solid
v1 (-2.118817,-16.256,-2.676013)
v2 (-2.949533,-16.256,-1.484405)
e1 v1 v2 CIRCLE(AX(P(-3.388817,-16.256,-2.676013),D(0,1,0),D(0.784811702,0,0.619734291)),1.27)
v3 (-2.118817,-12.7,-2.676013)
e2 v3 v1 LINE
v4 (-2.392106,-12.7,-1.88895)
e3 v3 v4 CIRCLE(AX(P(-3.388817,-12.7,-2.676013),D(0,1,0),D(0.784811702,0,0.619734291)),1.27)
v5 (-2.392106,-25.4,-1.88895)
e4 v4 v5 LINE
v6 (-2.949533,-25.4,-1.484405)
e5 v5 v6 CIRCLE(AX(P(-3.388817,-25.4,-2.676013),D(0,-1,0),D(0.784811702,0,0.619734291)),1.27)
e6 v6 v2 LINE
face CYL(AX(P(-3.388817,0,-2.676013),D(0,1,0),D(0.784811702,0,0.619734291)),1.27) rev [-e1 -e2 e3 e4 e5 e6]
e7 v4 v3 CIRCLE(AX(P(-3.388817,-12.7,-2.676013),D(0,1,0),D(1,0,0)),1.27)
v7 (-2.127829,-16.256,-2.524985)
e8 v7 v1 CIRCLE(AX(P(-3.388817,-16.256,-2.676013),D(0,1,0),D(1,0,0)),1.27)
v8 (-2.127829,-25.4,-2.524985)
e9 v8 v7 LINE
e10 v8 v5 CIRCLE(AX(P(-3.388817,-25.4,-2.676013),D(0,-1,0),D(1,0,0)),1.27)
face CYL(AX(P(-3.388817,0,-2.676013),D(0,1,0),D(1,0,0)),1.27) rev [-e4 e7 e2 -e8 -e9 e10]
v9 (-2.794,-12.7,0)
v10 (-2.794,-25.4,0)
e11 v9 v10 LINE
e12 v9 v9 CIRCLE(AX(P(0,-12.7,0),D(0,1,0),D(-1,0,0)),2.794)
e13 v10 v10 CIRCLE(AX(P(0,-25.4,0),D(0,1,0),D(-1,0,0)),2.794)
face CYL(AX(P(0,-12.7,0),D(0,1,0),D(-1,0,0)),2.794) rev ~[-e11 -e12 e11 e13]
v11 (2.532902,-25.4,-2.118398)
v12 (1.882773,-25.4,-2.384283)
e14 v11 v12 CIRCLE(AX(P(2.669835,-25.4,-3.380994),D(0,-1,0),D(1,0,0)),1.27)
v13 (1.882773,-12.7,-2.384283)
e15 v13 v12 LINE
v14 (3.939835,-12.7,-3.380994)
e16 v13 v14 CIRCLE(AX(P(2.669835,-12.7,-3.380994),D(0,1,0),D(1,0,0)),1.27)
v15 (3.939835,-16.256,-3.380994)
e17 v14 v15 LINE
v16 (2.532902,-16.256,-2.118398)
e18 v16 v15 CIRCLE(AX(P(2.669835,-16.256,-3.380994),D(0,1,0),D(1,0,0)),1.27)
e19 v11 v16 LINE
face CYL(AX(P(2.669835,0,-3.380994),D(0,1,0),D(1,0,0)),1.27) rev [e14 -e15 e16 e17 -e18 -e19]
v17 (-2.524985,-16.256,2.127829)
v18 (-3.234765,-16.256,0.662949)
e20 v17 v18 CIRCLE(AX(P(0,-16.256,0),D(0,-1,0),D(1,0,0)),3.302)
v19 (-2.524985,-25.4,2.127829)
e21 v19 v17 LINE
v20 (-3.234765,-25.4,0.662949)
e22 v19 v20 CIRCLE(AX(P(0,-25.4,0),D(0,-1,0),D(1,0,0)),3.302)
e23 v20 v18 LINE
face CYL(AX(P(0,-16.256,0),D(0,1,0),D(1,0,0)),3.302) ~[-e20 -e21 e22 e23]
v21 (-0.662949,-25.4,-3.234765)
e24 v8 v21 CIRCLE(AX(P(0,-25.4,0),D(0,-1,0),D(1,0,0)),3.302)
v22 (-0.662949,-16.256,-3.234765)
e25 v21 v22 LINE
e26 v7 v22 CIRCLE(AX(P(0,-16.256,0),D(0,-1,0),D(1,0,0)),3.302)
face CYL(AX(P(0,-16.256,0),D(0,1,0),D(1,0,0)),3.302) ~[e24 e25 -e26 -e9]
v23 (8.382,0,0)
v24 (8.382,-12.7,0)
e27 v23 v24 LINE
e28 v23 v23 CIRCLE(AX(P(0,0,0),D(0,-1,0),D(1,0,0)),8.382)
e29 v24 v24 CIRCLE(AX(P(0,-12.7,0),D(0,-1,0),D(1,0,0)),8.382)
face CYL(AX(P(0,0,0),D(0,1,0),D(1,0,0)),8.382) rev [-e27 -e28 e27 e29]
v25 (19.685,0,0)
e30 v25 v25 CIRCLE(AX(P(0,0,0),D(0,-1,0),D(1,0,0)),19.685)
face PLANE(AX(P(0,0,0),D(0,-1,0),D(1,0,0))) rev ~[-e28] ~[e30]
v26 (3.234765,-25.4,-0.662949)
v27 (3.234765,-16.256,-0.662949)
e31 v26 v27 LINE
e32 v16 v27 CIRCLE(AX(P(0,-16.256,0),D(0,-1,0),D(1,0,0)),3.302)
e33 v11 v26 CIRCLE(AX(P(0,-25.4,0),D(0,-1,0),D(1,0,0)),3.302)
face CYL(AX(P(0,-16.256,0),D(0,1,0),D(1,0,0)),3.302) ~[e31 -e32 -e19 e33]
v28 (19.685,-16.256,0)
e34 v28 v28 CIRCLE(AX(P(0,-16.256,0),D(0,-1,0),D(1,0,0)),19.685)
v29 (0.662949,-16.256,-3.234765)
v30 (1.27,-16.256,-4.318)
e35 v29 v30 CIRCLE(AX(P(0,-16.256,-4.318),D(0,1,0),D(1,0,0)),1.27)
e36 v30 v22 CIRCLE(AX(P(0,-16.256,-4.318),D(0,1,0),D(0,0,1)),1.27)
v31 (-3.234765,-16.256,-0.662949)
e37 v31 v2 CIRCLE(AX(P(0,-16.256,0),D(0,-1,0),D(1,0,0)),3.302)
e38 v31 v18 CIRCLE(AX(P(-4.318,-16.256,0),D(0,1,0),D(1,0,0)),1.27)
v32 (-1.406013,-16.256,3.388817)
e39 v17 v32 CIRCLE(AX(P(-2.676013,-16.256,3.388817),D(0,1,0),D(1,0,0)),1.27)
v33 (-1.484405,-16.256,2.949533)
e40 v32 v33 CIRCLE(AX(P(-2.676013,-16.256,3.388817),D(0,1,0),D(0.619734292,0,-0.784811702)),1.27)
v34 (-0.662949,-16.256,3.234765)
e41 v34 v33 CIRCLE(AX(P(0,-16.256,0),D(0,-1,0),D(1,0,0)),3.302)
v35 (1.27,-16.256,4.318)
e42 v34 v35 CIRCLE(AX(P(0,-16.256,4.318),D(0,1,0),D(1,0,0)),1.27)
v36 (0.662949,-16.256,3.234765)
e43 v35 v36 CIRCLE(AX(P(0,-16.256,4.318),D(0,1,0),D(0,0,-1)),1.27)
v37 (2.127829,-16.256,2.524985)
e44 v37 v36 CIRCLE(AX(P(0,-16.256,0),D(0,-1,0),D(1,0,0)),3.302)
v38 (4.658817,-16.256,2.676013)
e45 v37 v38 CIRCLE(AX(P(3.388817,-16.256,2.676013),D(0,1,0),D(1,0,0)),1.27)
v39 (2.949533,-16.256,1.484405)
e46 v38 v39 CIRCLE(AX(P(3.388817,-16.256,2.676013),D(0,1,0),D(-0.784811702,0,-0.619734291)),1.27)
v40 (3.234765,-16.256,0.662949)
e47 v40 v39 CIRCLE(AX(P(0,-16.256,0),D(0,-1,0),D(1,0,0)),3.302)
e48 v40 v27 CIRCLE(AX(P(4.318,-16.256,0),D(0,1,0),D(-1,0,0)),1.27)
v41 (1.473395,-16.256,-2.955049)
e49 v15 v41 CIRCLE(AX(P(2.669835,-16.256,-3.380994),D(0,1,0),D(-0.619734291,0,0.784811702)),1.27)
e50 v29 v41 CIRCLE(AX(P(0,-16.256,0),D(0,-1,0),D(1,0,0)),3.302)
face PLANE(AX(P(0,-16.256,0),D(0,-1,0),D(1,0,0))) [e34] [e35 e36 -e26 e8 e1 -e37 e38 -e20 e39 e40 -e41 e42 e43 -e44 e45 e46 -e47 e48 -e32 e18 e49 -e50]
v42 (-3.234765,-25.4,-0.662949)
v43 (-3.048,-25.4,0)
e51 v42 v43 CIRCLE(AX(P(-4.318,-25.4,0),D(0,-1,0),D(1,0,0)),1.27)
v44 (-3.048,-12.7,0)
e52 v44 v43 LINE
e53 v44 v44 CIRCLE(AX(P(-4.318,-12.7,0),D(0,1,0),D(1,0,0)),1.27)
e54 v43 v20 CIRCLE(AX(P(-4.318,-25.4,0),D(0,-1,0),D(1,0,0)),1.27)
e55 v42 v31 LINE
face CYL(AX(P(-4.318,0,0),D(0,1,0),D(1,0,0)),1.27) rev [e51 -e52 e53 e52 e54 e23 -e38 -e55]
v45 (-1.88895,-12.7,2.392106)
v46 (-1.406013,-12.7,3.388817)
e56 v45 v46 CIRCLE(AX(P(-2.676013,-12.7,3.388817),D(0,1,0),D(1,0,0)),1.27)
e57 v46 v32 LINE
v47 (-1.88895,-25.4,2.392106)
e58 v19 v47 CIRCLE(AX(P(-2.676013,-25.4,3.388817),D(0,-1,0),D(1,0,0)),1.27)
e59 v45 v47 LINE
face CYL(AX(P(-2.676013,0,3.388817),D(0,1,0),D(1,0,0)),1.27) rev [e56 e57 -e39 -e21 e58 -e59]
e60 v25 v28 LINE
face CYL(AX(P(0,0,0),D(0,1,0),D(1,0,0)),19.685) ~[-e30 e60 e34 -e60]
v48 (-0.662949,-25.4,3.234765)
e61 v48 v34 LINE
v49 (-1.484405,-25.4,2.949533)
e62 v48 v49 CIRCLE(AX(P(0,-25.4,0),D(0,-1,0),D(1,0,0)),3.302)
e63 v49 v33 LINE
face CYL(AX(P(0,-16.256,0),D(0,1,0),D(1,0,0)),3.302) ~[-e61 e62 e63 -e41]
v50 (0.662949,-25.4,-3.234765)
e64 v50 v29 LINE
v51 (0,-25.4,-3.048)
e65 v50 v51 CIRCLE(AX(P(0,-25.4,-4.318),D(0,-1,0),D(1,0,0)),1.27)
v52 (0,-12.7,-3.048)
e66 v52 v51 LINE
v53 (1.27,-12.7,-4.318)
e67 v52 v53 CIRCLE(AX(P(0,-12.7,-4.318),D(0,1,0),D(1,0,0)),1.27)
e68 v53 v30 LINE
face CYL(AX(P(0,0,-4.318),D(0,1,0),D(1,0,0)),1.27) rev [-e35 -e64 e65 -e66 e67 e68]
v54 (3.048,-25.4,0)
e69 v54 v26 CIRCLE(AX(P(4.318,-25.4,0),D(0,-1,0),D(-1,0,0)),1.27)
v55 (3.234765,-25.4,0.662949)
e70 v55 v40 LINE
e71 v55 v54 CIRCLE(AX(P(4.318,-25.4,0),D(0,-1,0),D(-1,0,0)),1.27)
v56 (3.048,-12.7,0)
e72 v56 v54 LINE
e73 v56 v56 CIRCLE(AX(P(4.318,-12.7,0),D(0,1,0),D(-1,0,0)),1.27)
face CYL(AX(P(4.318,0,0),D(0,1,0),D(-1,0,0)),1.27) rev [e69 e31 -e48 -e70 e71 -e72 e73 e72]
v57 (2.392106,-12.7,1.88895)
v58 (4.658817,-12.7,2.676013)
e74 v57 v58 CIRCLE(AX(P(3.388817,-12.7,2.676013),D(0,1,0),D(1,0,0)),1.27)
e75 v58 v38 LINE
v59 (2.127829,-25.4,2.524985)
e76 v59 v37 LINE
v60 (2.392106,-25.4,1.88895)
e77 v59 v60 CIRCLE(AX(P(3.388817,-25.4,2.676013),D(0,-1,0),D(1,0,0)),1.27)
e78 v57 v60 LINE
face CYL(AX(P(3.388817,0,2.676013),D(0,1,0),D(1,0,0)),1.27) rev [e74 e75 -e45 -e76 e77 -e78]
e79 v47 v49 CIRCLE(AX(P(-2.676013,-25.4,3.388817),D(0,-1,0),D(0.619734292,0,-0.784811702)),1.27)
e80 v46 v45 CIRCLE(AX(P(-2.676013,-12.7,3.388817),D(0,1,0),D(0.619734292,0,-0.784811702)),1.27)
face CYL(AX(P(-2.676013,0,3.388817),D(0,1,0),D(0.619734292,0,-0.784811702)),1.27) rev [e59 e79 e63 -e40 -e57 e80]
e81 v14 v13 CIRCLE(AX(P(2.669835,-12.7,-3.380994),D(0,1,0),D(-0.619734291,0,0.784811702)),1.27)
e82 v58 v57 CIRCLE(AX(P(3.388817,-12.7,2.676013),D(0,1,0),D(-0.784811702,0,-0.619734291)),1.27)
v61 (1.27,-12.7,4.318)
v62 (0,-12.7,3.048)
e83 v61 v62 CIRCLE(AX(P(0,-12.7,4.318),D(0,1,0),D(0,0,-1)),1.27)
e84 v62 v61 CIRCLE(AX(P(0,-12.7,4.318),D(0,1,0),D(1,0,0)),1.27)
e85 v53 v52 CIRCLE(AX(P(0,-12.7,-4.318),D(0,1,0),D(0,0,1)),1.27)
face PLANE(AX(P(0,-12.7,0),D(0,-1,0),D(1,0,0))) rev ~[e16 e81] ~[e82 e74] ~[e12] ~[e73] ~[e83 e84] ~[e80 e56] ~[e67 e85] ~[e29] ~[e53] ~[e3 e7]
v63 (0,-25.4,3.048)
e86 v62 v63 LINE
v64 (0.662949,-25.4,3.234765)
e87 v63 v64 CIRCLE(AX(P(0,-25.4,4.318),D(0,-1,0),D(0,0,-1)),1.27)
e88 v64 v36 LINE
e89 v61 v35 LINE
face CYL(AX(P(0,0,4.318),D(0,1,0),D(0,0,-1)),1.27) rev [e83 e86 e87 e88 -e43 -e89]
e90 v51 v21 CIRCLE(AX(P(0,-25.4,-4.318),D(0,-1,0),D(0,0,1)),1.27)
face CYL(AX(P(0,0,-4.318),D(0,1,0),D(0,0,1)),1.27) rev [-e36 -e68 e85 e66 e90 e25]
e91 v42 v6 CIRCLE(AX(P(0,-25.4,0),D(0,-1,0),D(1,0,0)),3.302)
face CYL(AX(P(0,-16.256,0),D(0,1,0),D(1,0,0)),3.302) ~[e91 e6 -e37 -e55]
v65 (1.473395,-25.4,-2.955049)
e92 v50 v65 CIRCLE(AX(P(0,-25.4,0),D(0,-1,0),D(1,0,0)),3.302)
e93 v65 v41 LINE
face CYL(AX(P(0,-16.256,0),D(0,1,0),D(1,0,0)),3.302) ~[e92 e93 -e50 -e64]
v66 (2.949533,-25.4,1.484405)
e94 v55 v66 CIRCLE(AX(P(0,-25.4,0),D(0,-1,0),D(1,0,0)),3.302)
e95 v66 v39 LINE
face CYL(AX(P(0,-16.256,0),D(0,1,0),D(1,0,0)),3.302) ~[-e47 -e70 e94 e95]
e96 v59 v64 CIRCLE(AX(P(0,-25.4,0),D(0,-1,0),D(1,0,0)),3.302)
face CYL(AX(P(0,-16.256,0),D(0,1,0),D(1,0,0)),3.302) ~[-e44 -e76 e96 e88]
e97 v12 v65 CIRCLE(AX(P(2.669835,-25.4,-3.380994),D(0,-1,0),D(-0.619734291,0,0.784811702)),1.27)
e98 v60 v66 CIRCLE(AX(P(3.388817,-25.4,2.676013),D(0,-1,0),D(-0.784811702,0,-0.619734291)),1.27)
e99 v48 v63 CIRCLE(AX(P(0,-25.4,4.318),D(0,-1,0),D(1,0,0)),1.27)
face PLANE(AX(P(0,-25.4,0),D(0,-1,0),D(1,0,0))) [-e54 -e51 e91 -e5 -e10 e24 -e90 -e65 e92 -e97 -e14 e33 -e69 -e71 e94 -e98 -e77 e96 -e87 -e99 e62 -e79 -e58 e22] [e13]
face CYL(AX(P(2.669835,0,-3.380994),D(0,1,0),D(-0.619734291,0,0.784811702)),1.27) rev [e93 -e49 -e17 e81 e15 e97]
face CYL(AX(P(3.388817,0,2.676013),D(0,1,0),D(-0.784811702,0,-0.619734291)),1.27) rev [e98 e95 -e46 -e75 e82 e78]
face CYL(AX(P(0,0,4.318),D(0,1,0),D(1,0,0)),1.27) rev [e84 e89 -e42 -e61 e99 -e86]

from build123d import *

# Parameters (mm, degrees)
F0_R     = 19.685
F1_DEPTH = 16.256
F2_R     = 8.382
F3_DEPTH = 12.7
F4_R     = 3.302
F5_DEPTH = 9.144
F6_R     = 1.27
F7_DEPTH = 25.4
F8_R     = 2.794
F9_DEPTH = 25.4


# Not quite as in the source:
# - a feature names something its author has since deleted; it is built from what else it names


with BuildPart() as f1:
    # F0 (on Front) → F1 (new body)
    with BuildSketch(Plane.XZ):
        Circle(F0_R)
    extrude(amount=F1_DEPTH)

    # F2 (on Front) → F3 (cut)
    with BuildSketch(Plane.XZ):
        Circle(F2_R)
    extrude(amount=F3_DEPTH, mode=Mode.SUBTRACT)

    # F4 (on face) → F5 (join)
    with BuildSketch(Plane.XZ.offset(16.256)):
        Circle(F4_R)
    extrude(amount=F5_DEPTH)

    # F6 (on Front) → F7 (cut)
    with BuildSketch(Plane.XZ):
        with BuildLine():
            ThreePointArc((1.27, 4.318), (-0.8980256121, 5.2160256121), (0, 3.048))
            ThreePointArc((0, 3.048), (0.8980256121, 3.4199743879), (1.27, 4.318))
        make_face()
        with BuildLine():
            ThreePointArc((-1.4060126705, 3.3888169304), (-3.8189189305, 3.9425906032), (-1.8889501203, 2.3921060685))
            ThreePointArc((-1.8889501203, 2.3921060685), (-1.5331064104, 2.8350432576), (-1.4060126705, 3.3888169304))
        make_face()
        with Locations((-4.318, 0)):
            Circle(F6_R)
        with BuildLine():
            ThreePointArc((-2.1188169304, -2.6760126705), (-2.1890830443, -2.259433023), (-2.3921060685, -1.8889501203))
            ThreePointArc((-2.3921060685, -1.8889501203), (-4.5885508164, -3.092592318), (-2.1188169304, -2.6760126705))
        make_face()
        with BuildLine():
            ThreePointArc((1.27, -4.318), (0.8980256121, -3.4199743879), (0, -3.048))
            ThreePointArc((0, -3.048), (-0.8980256121, -5.2160256121), (1.27, -4.318))
        make_face()
        with BuildLine():
            ThreePointArc((3.9398354632, -3.3809943125), (3.2236091359, -2.2380880524), (1.882772913, -2.3842834506))
            ThreePointArc((1.882772913, -2.3842834506), (2.1160617904, -4.5239005725), (3.9398354632, -3.3809943125))
        make_face()
        with BuildLine():
            ThreePointArc((5.588, 0), (4.318, 1.27), (3.048, 0))
            ThreePointArc((3.048, 0), (4.318, -1.27), (5.588, 0))
        make_face()
        with BuildLine():
            ThreePointArc((4.6588169304, 2.6760126705), (2.9722372829, 3.8757465565), (2.3921060685, 1.8889501203))
            ThreePointArc((2.3921060685, 1.8889501203), (3.8053965779, 1.4762787844), (4.6588169304, 2.6760126705))
        make_face()
    extrude(amount=F7_DEPTH, mode=Mode.SUBTRACT)

    # F8 (on face) → F9 (cut)
    with BuildSketch(Plane(origin=(0, -12.7, 0), x_dir=(-1, 0, 0), z_dir=(0, 1, 0))):
        Circle(F8_R)
    extrude(amount=-F9_DEPTH, mode=Mode.SUBTRACT)


solid = f1.part
